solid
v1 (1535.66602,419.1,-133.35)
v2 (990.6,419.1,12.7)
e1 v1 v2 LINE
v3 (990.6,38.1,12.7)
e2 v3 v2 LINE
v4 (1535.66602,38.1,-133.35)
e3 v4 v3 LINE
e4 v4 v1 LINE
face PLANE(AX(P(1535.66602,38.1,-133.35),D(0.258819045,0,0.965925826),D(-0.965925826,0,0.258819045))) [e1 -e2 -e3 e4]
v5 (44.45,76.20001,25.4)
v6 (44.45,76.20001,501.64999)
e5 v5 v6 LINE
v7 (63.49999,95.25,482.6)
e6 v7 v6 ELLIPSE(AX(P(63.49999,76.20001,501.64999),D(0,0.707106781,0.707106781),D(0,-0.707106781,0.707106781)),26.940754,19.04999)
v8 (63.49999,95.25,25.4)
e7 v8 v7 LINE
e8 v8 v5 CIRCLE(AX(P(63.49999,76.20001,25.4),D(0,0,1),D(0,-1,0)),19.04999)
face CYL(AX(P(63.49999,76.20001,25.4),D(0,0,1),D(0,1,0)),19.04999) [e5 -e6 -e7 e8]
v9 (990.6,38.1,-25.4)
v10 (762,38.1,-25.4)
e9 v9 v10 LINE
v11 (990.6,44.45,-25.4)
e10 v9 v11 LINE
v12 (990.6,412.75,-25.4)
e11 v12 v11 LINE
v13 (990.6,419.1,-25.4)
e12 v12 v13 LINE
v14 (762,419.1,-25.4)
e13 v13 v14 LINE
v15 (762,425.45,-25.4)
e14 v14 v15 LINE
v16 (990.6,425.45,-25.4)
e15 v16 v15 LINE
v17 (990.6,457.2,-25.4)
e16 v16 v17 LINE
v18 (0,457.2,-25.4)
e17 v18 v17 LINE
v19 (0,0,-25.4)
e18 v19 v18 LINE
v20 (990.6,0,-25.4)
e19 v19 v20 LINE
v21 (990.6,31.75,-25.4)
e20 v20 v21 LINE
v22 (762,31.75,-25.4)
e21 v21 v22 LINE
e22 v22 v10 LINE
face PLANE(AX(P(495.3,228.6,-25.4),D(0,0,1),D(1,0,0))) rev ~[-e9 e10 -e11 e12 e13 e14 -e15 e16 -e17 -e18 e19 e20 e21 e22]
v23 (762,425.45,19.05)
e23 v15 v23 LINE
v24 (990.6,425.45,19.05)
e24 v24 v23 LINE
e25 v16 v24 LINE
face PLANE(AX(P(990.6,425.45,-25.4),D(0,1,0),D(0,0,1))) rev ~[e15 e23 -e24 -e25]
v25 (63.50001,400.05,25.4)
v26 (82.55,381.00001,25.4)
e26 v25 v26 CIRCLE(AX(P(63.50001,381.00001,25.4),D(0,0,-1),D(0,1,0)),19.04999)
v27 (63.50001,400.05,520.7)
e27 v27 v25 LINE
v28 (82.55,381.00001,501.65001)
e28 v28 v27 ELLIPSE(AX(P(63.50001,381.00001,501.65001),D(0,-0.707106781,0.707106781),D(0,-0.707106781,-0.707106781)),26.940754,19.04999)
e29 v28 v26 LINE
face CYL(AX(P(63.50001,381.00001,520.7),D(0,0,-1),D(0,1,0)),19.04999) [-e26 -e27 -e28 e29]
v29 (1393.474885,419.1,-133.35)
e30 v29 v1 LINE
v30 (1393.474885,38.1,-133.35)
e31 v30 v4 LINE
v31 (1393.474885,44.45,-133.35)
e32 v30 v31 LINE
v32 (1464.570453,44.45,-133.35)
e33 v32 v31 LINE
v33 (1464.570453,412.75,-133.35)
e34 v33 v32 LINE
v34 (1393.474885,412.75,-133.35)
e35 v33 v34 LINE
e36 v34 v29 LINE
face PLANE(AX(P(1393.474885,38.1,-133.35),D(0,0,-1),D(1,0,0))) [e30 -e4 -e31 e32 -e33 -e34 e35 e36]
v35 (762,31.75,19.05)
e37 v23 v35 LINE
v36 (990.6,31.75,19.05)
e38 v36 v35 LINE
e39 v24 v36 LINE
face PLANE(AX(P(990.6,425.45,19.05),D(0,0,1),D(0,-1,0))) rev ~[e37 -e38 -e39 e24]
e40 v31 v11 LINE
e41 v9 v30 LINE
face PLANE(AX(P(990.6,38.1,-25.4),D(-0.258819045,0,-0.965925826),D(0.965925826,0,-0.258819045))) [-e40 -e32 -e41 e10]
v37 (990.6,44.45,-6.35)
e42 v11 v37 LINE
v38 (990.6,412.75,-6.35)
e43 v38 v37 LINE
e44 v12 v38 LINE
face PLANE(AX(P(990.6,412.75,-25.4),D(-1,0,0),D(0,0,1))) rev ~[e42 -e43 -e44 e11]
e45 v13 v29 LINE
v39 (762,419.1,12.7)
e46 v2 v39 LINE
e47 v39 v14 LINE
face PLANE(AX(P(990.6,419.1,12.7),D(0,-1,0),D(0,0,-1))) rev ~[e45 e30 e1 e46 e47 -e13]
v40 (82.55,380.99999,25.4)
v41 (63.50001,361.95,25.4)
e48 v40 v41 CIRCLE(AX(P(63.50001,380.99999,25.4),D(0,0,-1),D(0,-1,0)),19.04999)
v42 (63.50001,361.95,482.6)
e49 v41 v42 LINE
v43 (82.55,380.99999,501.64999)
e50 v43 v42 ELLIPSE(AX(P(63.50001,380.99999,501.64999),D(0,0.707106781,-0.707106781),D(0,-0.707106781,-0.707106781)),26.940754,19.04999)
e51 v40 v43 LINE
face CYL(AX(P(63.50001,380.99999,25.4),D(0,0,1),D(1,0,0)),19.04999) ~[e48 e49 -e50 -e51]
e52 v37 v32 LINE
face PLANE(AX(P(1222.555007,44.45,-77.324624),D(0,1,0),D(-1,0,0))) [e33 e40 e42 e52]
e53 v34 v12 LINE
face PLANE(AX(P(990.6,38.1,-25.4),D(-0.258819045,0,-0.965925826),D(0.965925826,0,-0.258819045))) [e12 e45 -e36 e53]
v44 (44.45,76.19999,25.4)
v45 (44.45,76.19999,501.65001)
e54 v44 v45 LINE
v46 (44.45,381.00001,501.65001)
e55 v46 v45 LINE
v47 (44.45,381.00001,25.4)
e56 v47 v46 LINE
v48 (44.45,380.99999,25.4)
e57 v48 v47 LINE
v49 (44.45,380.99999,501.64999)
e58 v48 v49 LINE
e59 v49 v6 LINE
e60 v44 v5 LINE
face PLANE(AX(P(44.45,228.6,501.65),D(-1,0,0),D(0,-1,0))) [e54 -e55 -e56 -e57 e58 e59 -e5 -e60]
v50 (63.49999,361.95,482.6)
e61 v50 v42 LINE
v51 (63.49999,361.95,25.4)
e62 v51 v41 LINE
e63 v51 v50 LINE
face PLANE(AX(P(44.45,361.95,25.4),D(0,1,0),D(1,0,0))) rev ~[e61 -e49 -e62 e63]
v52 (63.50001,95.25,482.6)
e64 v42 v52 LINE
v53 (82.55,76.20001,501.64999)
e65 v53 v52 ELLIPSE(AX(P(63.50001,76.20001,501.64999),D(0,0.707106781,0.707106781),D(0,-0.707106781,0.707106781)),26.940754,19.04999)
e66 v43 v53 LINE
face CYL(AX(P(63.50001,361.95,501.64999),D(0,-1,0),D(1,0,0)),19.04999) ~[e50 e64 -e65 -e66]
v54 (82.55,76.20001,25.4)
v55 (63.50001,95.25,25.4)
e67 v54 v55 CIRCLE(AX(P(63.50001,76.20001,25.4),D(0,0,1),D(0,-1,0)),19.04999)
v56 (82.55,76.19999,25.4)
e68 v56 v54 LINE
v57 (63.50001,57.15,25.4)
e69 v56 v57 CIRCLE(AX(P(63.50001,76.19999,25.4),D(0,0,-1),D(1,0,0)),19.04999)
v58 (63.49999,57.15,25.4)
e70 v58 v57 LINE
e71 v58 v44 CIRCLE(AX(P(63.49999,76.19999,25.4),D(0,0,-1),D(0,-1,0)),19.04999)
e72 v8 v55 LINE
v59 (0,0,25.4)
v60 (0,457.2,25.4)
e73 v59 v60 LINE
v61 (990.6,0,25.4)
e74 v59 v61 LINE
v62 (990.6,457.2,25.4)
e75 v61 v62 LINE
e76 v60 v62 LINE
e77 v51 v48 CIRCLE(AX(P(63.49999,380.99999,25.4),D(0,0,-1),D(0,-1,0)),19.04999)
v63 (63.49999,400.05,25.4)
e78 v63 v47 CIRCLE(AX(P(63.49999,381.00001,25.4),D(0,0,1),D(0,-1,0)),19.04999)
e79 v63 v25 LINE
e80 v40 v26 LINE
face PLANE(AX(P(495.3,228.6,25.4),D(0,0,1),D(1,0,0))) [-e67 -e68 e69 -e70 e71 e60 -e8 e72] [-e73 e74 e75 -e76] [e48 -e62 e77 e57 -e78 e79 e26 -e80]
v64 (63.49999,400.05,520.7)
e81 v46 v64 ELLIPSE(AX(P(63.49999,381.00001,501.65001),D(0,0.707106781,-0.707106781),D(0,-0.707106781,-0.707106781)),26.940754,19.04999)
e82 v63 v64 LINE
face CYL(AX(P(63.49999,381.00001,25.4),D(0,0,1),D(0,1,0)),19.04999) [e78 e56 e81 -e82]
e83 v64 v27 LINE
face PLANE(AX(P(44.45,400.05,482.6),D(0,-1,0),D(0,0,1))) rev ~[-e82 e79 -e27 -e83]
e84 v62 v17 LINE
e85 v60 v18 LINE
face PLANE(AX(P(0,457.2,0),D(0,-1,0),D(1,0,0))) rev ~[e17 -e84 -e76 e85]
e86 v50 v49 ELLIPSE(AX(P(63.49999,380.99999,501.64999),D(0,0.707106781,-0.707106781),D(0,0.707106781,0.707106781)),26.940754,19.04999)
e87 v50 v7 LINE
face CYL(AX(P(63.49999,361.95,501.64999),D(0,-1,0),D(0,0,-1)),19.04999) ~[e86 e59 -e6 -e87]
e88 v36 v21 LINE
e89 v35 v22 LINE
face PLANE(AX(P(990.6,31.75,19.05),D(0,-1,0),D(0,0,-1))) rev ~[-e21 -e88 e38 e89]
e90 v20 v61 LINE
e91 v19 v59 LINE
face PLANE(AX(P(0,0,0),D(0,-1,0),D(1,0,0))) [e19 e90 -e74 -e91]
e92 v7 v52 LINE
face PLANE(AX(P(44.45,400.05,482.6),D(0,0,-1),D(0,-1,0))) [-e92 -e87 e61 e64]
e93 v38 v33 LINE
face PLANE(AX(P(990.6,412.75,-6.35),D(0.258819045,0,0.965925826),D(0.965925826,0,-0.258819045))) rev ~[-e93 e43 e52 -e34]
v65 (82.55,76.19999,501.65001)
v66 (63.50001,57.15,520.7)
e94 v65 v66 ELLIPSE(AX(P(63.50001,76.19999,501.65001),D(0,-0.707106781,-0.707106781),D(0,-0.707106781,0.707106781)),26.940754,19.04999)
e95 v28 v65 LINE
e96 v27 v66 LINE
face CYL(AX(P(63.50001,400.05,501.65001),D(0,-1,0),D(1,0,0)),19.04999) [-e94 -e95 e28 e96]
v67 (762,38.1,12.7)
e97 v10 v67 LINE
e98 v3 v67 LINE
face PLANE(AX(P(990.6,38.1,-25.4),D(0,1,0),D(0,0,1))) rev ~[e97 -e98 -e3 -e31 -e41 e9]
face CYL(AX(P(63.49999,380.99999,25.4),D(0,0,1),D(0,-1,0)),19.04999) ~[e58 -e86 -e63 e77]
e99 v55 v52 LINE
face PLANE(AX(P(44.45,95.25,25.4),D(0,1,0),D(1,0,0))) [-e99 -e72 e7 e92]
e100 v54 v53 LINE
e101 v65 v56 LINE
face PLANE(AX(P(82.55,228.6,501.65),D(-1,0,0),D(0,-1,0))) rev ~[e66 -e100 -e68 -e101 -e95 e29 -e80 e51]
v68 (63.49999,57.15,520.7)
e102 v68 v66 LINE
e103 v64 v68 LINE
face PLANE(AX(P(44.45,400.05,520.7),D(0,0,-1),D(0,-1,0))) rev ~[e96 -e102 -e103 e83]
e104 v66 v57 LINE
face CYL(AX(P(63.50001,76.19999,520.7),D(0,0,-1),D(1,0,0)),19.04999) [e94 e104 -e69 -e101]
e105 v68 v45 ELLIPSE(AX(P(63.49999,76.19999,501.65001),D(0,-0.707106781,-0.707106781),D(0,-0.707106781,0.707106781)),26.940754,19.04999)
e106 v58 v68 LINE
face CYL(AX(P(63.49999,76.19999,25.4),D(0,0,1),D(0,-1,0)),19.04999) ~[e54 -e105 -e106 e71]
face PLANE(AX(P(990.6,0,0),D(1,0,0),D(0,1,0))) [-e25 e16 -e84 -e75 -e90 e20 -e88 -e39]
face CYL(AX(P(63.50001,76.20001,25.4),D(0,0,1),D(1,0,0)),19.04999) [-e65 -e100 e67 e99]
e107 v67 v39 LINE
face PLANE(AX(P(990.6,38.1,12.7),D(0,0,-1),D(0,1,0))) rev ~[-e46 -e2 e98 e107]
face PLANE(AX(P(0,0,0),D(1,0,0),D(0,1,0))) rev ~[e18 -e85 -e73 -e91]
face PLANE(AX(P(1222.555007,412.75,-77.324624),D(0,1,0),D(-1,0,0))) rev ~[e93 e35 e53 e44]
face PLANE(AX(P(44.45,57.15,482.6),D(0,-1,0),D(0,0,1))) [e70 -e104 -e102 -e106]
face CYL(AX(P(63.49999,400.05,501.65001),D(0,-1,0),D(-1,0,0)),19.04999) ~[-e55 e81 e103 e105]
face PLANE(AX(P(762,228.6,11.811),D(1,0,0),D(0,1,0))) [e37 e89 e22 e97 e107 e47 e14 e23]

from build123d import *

# Parameters (mm, degrees)
F0_W          = 990.6
F0_H          = 457.2
F1_DEPTH      = 25.4
F1_DEPTH_BACK = 25.4
F2_W          = 38.1
F2_H          = 38.1
F3_DEPTH      = 457.2
F4_W          = 342.9
F4_H          = 38.1
F5_DEPTH      = 38.1
F6_R          = 19.04999
F8_START      = -38.1
F8_DEPTH      = 381
F10_DEPTH     = 228.6
F12_START     = -6.35
F12_DEPTH     = 368.3


# Not quite as in the source:
# - a fillet or chamfer is up to 0.001 mm smaller than in the source, because OpenCascade refuses the exact size


with BuildPart() as f1:
    # F0 (on Top) → F1 (new body, two sides)
    with BuildSketch(Plane.XY) as f1_sk:
        with Locations((495.3, 228.6)):
            Rectangle(F0_W, F0_H)
    extrude(amount=F1_DEPTH)
    extrude(f1_sk.sketch, amount=-F1_DEPTH_BACK)

    # F2 (on face) → F3 (join)
    with BuildSketch(Plane.XY.offset(25.4)):
        with Locations((63.5, 381)):
            Rectangle(F2_W, F2_H)
        with Locations((63.5, 76.2)):
            Rectangle(F2_W, F2_H)
    extrude(amount=F3_DEPTH)

    # F4 (on face) → F5 (join)
    with BuildSketch(Plane(origin=(44.45, 0, 0), x_dir=(0, -1, 0), z_dir=(-1, 0, 0))):
        with Locations((-228.6, 501.65)):
            Rectangle(F4_W, F4_H)
    extrude(amount=-F5_DEPTH)

    # F6 (radius 19.05 in the source; OpenCascade refuses exactly that, so slightly less here)
    f6_edges = [f1.edges().sort_by_distance(p)[0] for p in [
        (82.55, 228.6, 520.7),
        (82.55, 228.6, 482.6),
        (82.55, 361.95, 254),
        (44.45, 361.95, 254),
        (82.55, 400.05, 273.05),
        (82.55, 57.15, 273.05),
        (44.45, 57.15, 273.05),
        (44.45, 228.6, 520.7),
        (44.45, 400.05, 273.05),
        (44.45, 95.25, 254),
        (82.55, 95.25, 254),
        (44.45, 228.6, 482.6),
    ]]
    fillet(f6_edges, radius=F6_R)

    # F7 (on face) → F8 (join)
    with BuildSketch(Plane.XZ.offset(F8_START)):
        Polygon((990.6, -25.4), (1393.4748846771, -133.35), (1535.6660204454, -133.35), (990.6, 12.7), align=None)
    extrude(amount=-F8_DEPTH)

    # F9 (on face) → F10 (cut)
    with BuildSketch(Plane.YZ.offset(990.6)):
        Polygon((425.45, 19.05), (31.75, 19.05), (31.75, -25.4), (38.1, -25.4), (38.1, 12.7), (419.1, 12.7), (419.1, -25.4), (425.45, -25.4), align=None)
    extrude(amount=-F10_DEPTH, mode=Mode.SUBTRACT)

    # F11 (on face) → F12 (cut)
    with BuildSketch(Plane(origin=(0, 419.1, 0), x_dir=(-1, 0, 0), z_dir=(0, 1, 0)).offset(F12_START)):
        Polygon((-990.6, -6.35), (-1464.5704525612, -133.35), (-1393.4748846771, -133.35), (-990.6, -25.4), align=None)
    extrude(amount=-F12_DEPTH, mode=Mode.SUBTRACT)


solid = f1.part
